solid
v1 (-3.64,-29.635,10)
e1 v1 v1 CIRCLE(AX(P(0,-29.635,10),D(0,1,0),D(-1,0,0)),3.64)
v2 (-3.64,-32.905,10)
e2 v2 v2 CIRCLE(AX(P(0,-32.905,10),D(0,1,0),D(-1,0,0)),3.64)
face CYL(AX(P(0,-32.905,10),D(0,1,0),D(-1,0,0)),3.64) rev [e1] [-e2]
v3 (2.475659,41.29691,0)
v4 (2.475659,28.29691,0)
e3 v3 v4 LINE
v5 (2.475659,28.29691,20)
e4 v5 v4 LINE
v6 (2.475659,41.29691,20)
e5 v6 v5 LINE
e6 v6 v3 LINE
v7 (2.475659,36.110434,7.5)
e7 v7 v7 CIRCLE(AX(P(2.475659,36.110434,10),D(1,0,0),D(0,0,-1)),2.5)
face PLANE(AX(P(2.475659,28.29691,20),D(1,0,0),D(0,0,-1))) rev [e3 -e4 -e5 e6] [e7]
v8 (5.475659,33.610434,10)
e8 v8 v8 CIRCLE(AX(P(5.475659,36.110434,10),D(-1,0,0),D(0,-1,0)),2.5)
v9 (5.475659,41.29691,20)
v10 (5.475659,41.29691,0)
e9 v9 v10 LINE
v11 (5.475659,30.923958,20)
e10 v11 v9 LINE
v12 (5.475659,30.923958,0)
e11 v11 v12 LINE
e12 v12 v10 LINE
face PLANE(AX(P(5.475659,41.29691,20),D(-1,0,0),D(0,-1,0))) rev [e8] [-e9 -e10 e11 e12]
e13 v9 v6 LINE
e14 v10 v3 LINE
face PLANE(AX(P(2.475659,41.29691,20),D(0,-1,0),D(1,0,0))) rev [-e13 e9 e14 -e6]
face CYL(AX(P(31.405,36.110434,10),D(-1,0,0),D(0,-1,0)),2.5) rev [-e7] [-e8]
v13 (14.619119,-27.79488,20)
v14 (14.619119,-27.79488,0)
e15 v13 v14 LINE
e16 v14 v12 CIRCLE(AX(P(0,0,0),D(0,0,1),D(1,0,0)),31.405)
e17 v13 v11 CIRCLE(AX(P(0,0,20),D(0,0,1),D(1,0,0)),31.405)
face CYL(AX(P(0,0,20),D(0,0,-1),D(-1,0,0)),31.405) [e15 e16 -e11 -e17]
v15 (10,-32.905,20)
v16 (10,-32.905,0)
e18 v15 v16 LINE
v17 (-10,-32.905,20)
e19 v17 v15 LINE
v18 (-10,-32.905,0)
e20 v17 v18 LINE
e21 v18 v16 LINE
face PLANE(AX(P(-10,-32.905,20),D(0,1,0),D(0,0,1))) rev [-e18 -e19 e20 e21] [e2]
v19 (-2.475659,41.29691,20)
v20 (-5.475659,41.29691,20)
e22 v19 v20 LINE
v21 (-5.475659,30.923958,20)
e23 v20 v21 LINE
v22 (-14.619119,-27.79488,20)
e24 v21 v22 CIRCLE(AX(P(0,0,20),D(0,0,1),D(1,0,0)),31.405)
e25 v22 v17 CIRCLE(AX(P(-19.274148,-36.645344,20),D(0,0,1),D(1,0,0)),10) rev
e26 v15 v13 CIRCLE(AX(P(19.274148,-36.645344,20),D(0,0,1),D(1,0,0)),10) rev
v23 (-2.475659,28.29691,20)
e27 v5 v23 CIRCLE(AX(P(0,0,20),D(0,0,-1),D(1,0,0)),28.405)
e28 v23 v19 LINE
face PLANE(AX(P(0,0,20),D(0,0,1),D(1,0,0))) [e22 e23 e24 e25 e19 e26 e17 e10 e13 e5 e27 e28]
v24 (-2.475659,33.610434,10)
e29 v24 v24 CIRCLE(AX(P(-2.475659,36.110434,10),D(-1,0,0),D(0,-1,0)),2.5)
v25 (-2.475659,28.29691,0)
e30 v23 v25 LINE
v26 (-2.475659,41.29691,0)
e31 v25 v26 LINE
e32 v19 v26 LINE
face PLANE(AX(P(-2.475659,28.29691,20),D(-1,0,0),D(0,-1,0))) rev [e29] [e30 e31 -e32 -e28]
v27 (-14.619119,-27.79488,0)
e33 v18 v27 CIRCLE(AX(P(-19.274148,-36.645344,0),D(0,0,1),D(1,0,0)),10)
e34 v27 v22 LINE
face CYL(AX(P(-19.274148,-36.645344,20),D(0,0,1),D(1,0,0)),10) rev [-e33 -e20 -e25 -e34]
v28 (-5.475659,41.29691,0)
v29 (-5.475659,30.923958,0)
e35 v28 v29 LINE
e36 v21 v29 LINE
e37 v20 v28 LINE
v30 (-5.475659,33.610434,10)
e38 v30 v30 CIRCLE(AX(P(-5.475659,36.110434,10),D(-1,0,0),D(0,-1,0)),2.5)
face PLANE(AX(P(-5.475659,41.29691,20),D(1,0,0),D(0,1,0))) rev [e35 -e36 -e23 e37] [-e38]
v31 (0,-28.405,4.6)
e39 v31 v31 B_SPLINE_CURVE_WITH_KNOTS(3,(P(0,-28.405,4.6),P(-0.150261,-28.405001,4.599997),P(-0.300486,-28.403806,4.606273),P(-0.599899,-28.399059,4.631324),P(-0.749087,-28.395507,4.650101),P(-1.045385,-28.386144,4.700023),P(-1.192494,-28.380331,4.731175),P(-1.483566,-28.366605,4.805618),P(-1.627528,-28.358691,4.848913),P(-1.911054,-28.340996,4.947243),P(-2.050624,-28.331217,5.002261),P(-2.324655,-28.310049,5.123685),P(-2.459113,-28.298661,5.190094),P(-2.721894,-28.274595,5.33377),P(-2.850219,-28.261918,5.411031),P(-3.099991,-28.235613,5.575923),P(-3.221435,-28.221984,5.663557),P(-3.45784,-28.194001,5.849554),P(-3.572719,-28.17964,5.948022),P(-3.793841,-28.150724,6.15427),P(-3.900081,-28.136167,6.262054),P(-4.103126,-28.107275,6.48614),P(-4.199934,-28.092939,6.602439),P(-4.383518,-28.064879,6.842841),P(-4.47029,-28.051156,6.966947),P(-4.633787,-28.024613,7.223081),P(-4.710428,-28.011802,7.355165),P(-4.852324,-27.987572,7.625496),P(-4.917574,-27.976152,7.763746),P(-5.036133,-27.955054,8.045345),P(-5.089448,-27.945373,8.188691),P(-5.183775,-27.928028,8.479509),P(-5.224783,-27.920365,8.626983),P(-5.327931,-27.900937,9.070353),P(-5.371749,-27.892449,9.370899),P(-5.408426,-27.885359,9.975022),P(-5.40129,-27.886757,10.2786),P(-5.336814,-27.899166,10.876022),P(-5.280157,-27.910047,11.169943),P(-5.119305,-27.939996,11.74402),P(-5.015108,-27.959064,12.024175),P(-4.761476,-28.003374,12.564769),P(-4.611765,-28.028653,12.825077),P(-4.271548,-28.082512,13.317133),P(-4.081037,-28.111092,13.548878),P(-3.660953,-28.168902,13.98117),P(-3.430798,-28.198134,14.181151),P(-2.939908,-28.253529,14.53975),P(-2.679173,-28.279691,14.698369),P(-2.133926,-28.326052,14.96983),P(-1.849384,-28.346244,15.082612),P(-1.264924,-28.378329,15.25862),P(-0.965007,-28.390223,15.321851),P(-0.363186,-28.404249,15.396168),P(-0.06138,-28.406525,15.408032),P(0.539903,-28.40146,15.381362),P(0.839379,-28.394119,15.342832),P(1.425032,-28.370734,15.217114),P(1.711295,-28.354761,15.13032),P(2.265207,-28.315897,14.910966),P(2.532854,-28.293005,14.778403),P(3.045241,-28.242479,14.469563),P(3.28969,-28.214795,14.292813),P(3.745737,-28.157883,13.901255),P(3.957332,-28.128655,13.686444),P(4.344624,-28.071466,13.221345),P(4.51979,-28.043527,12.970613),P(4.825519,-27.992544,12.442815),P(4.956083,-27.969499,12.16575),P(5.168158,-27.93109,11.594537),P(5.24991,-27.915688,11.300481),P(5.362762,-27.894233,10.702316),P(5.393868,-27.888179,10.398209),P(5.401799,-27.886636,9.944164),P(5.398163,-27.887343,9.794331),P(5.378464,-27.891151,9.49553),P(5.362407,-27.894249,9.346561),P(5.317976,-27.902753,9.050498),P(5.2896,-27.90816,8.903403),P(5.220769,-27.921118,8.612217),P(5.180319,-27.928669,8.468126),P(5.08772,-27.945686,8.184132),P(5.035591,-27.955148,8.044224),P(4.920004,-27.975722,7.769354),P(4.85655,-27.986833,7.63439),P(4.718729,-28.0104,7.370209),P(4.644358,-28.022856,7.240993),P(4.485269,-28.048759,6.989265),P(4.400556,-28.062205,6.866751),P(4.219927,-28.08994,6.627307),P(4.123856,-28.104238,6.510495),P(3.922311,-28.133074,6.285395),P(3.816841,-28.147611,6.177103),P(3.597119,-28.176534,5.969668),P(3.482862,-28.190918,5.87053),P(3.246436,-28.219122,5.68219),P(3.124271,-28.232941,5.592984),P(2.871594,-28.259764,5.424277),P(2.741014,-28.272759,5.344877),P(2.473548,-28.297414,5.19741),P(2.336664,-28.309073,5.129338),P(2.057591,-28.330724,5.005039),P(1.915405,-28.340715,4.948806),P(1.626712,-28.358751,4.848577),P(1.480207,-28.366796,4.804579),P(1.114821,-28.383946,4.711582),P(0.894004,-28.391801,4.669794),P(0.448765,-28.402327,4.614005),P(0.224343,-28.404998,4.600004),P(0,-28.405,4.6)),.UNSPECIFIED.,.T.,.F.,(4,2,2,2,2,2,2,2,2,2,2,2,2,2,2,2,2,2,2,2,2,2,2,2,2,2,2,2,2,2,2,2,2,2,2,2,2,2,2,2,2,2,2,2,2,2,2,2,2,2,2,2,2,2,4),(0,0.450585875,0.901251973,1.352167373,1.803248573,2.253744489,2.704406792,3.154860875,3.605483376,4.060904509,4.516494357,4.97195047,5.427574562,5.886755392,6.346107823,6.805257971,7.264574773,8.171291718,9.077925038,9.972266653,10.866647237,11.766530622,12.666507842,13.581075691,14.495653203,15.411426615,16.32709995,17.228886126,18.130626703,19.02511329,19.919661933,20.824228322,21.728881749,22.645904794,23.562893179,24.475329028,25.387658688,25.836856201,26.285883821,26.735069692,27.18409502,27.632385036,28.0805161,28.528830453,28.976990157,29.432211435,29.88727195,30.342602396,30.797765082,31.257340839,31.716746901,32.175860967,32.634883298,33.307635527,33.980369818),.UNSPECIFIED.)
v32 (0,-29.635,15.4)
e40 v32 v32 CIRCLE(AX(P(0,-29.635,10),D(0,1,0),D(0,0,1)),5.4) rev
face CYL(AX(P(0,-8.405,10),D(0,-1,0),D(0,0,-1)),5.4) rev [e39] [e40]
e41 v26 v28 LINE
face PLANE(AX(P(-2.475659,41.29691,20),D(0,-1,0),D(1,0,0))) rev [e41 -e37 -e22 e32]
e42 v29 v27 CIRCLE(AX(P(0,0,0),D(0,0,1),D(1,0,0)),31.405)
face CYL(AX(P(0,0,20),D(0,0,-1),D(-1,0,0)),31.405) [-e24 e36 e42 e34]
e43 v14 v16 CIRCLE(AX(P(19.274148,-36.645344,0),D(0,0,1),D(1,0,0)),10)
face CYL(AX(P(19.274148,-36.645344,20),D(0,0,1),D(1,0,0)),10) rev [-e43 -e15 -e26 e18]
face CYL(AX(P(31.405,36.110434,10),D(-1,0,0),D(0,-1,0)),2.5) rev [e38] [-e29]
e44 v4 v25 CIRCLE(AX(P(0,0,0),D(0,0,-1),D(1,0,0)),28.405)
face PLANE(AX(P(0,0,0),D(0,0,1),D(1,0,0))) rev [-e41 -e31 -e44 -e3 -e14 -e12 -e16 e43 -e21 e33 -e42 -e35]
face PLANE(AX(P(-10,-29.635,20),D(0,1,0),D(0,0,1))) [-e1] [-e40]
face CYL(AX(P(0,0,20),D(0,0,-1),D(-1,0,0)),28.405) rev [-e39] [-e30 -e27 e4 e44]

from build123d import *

# Parameters (mm, degrees)
BOSS_EXTRUDE1_DEPTH                 = 20
FILLET1_R                           = 10
SKETCH3_R                           = 5.4
CUT_EXTRUDE3_DEPTH                  = 1.23
CUT_EXTRUDE3_DIRECTION_2_REACH      = 81.023
CUT_EXTRUDE3_DIRECTION_2_END_RADIUS = 28.405
SKETCH4_R                           = 3.64
CUT_EXTRUDE4_DEPTH                  = 81.10998653
SKETCH5_R                           = 2.5
CUT_EXTRUDE5_DEPTH                  = 59.869498141


with BuildPart() as part:
    # Sketch2 → Boss-Extrude1 (new body)
    with BuildSketch(Plane.XY):
        with BuildLine():
            Line((-10, -29.770354801), (-10, -32.905))
            Line((-10, -32.905), (10, -32.905))
            Line((10, -32.905), (10, -29.770354801))
            ThreePointArc((10, -29.770354801), (31.318108327, 2.334548309), (5.475658873, 30.923958105))
            Line((5.475658873, 30.923958105), (5.475658873, 41.296910399))
            Line((5.475658873, 41.296910399), (2.475658873, 41.296910399))
            Line((2.475658873, 41.296910399), (2.475658873, 28.296910399))
            ThreePointArc((2.475658873, 28.296910399), (0, -28.405), (-2.475658873, 28.296910399))
            Line((-2.475658873, 28.296910399), (-2.475658873, 41.296910399))
            Line((-2.475658873, 41.296910399), (-5.475658873, 41.296910399))
            Line((-5.475658873, 41.296910399), (-5.475658873, 30.923958105))
            ThreePointArc((-5.475658873, 30.923958105), (-31.318108327, 2.334548309), (-10, -29.770354801))
        make_face()
    extrude(amount=BOSS_EXTRUDE1_DEPTH)

    # Fillet1
    # the kernel refuses this fillet: 10 mm, written as the material it adds along each edge
    with BuildSketch(Plane(origin=(10, -29.770354801, 0), x_dir=(0, -1, 0), z_dir=(0, 0, 1))) as fillet1_piece_1:
        with BuildLine():
            CenterArc((6.874989117, 9.274148337), FILLET1_R, 207.74277492, 40.292580152)
            Line((-1.975474334, 4.619119153), (-2.152483603, 4.526018569))
            ThreePointArc((-2.152483603, 4.526018569), (-1.079113359, 2.270480411), (-0.189589905, -0.063684127))
            Line((-0.189589905, -0.063684127), (0, -0.2))
            ThreePointArc((0, -0.2), (1.567322599, -0.2), (3.05983832, -0.185482967))
            Line((3.05983832, -0.185482967), (3.134645199, 0))
        make_face()
    extrude(amount=20)
    with BuildSketch(Plane(origin=(-10, -29.770354801, 0), x_dir=(0, -1, 0), z_dir=(0, 0, 1))) as fillet1_piece_2:
        with BuildLine():
            CenterArc((6.874989117, -9.274148337), FILLET1_R, 111.964644928, 40.292580152)
            Line((-1.975474334, -4.619119153), (-2.152483603, -4.526018569))
            ThreePointArc((-2.152483603, -4.526018569), (-1.079113359, -2.270480411), (-0.189589905, 0.063684127))
            Line((-0.189589905, 0.063684127), (0, 0.2))
            ThreePointArc((0, 0.2), (1.567322599, 0.2), (3.05983832, 0.185482967))
            Line((3.05983832, 0.185482967), (3.134645199, 0))
        make_face()
    extrude(amount=20)

    # Sketch3 → Cut-Extrude3 (cut)
    with BuildSketch(Plane(origin=(0, -28.405, 0), x_dir=(1, 0, 0), z_dir=(0, 1, 0))):
        with Locations(Location((0, -10, 0), (0, 0, 90))):
            Circle(SKETCH3_R)
    extrude(amount=-CUT_EXTRUDE3_DEPTH, mode=Mode.SUBTRACT)

    # Cut-Extrude3 direction 2: up to this cylinder (the profile starts outside it)
    cut_extrude3_direction_2_end = Plane(origin=(0, 0, 10), z_dir=(0, 0, -1)) * Cylinder(CUT_EXTRUDE3_DIRECTION_2_END_RADIUS, 219.856, mode=Mode.PRIVATE)
    # Sketch3 → Cut-Extrude3 direction 2 (cut, up to the surface)
    with BuildSketch(Plane(origin=(0, -28.405, 0), x_dir=(1, 0, 0), z_dir=(0, 1, 0)), mode=Mode.PRIVATE) as cut_extrude3_direction_2_sk1:
        with Locations(Location((0, -10, 0), (0, 0, 90))):
            Circle(SKETCH3_R)
    cut_extrude3_direction_2_tool1 = extrude(cut_extrude3_direction_2_sk1.sketch, amount=CUT_EXTRUDE3_DIRECTION_2_REACH, mode=Mode.PRIVATE) - cut_extrude3_direction_2_end
    add(cut_extrude3_direction_2_tool1.solids().sort_by_distance((0, -28.405, 10))[0], mode=Mode.SUBTRACT)
    add(cut_extrude3_direction_2_tool1.solids().sort_by_distance((0, -28.405, 10))[1], mode=Mode.SUBTRACT)

    # Sketch4 → Cut-Extrude4 (cut, through all)
    with BuildSketch(Plane(origin=(0, -29.635, 0), x_dir=(1, 0, 0), z_dir=(0, 1, 0))):
        with Locations(Location((0, -10, 0), (0, 0, 180))):
            Circle(SKETCH4_R)
    extrude(amount=-CUT_EXTRUDE4_DEPTH, mode=Mode.SUBTRACT)

    # Sketch5 → Cut-Extrude5 (cut, through all)
    with BuildSketch(Plane.ZY.offset(5.475658873)):
        with Locations(Location((10, 36.110434252, 0), (0, 0, 270))):
            Circle(SKETCH5_R)
    extrude(amount=-CUT_EXTRUDE5_DEPTH, mode=Mode.SUBTRACT)


solid = part.part
